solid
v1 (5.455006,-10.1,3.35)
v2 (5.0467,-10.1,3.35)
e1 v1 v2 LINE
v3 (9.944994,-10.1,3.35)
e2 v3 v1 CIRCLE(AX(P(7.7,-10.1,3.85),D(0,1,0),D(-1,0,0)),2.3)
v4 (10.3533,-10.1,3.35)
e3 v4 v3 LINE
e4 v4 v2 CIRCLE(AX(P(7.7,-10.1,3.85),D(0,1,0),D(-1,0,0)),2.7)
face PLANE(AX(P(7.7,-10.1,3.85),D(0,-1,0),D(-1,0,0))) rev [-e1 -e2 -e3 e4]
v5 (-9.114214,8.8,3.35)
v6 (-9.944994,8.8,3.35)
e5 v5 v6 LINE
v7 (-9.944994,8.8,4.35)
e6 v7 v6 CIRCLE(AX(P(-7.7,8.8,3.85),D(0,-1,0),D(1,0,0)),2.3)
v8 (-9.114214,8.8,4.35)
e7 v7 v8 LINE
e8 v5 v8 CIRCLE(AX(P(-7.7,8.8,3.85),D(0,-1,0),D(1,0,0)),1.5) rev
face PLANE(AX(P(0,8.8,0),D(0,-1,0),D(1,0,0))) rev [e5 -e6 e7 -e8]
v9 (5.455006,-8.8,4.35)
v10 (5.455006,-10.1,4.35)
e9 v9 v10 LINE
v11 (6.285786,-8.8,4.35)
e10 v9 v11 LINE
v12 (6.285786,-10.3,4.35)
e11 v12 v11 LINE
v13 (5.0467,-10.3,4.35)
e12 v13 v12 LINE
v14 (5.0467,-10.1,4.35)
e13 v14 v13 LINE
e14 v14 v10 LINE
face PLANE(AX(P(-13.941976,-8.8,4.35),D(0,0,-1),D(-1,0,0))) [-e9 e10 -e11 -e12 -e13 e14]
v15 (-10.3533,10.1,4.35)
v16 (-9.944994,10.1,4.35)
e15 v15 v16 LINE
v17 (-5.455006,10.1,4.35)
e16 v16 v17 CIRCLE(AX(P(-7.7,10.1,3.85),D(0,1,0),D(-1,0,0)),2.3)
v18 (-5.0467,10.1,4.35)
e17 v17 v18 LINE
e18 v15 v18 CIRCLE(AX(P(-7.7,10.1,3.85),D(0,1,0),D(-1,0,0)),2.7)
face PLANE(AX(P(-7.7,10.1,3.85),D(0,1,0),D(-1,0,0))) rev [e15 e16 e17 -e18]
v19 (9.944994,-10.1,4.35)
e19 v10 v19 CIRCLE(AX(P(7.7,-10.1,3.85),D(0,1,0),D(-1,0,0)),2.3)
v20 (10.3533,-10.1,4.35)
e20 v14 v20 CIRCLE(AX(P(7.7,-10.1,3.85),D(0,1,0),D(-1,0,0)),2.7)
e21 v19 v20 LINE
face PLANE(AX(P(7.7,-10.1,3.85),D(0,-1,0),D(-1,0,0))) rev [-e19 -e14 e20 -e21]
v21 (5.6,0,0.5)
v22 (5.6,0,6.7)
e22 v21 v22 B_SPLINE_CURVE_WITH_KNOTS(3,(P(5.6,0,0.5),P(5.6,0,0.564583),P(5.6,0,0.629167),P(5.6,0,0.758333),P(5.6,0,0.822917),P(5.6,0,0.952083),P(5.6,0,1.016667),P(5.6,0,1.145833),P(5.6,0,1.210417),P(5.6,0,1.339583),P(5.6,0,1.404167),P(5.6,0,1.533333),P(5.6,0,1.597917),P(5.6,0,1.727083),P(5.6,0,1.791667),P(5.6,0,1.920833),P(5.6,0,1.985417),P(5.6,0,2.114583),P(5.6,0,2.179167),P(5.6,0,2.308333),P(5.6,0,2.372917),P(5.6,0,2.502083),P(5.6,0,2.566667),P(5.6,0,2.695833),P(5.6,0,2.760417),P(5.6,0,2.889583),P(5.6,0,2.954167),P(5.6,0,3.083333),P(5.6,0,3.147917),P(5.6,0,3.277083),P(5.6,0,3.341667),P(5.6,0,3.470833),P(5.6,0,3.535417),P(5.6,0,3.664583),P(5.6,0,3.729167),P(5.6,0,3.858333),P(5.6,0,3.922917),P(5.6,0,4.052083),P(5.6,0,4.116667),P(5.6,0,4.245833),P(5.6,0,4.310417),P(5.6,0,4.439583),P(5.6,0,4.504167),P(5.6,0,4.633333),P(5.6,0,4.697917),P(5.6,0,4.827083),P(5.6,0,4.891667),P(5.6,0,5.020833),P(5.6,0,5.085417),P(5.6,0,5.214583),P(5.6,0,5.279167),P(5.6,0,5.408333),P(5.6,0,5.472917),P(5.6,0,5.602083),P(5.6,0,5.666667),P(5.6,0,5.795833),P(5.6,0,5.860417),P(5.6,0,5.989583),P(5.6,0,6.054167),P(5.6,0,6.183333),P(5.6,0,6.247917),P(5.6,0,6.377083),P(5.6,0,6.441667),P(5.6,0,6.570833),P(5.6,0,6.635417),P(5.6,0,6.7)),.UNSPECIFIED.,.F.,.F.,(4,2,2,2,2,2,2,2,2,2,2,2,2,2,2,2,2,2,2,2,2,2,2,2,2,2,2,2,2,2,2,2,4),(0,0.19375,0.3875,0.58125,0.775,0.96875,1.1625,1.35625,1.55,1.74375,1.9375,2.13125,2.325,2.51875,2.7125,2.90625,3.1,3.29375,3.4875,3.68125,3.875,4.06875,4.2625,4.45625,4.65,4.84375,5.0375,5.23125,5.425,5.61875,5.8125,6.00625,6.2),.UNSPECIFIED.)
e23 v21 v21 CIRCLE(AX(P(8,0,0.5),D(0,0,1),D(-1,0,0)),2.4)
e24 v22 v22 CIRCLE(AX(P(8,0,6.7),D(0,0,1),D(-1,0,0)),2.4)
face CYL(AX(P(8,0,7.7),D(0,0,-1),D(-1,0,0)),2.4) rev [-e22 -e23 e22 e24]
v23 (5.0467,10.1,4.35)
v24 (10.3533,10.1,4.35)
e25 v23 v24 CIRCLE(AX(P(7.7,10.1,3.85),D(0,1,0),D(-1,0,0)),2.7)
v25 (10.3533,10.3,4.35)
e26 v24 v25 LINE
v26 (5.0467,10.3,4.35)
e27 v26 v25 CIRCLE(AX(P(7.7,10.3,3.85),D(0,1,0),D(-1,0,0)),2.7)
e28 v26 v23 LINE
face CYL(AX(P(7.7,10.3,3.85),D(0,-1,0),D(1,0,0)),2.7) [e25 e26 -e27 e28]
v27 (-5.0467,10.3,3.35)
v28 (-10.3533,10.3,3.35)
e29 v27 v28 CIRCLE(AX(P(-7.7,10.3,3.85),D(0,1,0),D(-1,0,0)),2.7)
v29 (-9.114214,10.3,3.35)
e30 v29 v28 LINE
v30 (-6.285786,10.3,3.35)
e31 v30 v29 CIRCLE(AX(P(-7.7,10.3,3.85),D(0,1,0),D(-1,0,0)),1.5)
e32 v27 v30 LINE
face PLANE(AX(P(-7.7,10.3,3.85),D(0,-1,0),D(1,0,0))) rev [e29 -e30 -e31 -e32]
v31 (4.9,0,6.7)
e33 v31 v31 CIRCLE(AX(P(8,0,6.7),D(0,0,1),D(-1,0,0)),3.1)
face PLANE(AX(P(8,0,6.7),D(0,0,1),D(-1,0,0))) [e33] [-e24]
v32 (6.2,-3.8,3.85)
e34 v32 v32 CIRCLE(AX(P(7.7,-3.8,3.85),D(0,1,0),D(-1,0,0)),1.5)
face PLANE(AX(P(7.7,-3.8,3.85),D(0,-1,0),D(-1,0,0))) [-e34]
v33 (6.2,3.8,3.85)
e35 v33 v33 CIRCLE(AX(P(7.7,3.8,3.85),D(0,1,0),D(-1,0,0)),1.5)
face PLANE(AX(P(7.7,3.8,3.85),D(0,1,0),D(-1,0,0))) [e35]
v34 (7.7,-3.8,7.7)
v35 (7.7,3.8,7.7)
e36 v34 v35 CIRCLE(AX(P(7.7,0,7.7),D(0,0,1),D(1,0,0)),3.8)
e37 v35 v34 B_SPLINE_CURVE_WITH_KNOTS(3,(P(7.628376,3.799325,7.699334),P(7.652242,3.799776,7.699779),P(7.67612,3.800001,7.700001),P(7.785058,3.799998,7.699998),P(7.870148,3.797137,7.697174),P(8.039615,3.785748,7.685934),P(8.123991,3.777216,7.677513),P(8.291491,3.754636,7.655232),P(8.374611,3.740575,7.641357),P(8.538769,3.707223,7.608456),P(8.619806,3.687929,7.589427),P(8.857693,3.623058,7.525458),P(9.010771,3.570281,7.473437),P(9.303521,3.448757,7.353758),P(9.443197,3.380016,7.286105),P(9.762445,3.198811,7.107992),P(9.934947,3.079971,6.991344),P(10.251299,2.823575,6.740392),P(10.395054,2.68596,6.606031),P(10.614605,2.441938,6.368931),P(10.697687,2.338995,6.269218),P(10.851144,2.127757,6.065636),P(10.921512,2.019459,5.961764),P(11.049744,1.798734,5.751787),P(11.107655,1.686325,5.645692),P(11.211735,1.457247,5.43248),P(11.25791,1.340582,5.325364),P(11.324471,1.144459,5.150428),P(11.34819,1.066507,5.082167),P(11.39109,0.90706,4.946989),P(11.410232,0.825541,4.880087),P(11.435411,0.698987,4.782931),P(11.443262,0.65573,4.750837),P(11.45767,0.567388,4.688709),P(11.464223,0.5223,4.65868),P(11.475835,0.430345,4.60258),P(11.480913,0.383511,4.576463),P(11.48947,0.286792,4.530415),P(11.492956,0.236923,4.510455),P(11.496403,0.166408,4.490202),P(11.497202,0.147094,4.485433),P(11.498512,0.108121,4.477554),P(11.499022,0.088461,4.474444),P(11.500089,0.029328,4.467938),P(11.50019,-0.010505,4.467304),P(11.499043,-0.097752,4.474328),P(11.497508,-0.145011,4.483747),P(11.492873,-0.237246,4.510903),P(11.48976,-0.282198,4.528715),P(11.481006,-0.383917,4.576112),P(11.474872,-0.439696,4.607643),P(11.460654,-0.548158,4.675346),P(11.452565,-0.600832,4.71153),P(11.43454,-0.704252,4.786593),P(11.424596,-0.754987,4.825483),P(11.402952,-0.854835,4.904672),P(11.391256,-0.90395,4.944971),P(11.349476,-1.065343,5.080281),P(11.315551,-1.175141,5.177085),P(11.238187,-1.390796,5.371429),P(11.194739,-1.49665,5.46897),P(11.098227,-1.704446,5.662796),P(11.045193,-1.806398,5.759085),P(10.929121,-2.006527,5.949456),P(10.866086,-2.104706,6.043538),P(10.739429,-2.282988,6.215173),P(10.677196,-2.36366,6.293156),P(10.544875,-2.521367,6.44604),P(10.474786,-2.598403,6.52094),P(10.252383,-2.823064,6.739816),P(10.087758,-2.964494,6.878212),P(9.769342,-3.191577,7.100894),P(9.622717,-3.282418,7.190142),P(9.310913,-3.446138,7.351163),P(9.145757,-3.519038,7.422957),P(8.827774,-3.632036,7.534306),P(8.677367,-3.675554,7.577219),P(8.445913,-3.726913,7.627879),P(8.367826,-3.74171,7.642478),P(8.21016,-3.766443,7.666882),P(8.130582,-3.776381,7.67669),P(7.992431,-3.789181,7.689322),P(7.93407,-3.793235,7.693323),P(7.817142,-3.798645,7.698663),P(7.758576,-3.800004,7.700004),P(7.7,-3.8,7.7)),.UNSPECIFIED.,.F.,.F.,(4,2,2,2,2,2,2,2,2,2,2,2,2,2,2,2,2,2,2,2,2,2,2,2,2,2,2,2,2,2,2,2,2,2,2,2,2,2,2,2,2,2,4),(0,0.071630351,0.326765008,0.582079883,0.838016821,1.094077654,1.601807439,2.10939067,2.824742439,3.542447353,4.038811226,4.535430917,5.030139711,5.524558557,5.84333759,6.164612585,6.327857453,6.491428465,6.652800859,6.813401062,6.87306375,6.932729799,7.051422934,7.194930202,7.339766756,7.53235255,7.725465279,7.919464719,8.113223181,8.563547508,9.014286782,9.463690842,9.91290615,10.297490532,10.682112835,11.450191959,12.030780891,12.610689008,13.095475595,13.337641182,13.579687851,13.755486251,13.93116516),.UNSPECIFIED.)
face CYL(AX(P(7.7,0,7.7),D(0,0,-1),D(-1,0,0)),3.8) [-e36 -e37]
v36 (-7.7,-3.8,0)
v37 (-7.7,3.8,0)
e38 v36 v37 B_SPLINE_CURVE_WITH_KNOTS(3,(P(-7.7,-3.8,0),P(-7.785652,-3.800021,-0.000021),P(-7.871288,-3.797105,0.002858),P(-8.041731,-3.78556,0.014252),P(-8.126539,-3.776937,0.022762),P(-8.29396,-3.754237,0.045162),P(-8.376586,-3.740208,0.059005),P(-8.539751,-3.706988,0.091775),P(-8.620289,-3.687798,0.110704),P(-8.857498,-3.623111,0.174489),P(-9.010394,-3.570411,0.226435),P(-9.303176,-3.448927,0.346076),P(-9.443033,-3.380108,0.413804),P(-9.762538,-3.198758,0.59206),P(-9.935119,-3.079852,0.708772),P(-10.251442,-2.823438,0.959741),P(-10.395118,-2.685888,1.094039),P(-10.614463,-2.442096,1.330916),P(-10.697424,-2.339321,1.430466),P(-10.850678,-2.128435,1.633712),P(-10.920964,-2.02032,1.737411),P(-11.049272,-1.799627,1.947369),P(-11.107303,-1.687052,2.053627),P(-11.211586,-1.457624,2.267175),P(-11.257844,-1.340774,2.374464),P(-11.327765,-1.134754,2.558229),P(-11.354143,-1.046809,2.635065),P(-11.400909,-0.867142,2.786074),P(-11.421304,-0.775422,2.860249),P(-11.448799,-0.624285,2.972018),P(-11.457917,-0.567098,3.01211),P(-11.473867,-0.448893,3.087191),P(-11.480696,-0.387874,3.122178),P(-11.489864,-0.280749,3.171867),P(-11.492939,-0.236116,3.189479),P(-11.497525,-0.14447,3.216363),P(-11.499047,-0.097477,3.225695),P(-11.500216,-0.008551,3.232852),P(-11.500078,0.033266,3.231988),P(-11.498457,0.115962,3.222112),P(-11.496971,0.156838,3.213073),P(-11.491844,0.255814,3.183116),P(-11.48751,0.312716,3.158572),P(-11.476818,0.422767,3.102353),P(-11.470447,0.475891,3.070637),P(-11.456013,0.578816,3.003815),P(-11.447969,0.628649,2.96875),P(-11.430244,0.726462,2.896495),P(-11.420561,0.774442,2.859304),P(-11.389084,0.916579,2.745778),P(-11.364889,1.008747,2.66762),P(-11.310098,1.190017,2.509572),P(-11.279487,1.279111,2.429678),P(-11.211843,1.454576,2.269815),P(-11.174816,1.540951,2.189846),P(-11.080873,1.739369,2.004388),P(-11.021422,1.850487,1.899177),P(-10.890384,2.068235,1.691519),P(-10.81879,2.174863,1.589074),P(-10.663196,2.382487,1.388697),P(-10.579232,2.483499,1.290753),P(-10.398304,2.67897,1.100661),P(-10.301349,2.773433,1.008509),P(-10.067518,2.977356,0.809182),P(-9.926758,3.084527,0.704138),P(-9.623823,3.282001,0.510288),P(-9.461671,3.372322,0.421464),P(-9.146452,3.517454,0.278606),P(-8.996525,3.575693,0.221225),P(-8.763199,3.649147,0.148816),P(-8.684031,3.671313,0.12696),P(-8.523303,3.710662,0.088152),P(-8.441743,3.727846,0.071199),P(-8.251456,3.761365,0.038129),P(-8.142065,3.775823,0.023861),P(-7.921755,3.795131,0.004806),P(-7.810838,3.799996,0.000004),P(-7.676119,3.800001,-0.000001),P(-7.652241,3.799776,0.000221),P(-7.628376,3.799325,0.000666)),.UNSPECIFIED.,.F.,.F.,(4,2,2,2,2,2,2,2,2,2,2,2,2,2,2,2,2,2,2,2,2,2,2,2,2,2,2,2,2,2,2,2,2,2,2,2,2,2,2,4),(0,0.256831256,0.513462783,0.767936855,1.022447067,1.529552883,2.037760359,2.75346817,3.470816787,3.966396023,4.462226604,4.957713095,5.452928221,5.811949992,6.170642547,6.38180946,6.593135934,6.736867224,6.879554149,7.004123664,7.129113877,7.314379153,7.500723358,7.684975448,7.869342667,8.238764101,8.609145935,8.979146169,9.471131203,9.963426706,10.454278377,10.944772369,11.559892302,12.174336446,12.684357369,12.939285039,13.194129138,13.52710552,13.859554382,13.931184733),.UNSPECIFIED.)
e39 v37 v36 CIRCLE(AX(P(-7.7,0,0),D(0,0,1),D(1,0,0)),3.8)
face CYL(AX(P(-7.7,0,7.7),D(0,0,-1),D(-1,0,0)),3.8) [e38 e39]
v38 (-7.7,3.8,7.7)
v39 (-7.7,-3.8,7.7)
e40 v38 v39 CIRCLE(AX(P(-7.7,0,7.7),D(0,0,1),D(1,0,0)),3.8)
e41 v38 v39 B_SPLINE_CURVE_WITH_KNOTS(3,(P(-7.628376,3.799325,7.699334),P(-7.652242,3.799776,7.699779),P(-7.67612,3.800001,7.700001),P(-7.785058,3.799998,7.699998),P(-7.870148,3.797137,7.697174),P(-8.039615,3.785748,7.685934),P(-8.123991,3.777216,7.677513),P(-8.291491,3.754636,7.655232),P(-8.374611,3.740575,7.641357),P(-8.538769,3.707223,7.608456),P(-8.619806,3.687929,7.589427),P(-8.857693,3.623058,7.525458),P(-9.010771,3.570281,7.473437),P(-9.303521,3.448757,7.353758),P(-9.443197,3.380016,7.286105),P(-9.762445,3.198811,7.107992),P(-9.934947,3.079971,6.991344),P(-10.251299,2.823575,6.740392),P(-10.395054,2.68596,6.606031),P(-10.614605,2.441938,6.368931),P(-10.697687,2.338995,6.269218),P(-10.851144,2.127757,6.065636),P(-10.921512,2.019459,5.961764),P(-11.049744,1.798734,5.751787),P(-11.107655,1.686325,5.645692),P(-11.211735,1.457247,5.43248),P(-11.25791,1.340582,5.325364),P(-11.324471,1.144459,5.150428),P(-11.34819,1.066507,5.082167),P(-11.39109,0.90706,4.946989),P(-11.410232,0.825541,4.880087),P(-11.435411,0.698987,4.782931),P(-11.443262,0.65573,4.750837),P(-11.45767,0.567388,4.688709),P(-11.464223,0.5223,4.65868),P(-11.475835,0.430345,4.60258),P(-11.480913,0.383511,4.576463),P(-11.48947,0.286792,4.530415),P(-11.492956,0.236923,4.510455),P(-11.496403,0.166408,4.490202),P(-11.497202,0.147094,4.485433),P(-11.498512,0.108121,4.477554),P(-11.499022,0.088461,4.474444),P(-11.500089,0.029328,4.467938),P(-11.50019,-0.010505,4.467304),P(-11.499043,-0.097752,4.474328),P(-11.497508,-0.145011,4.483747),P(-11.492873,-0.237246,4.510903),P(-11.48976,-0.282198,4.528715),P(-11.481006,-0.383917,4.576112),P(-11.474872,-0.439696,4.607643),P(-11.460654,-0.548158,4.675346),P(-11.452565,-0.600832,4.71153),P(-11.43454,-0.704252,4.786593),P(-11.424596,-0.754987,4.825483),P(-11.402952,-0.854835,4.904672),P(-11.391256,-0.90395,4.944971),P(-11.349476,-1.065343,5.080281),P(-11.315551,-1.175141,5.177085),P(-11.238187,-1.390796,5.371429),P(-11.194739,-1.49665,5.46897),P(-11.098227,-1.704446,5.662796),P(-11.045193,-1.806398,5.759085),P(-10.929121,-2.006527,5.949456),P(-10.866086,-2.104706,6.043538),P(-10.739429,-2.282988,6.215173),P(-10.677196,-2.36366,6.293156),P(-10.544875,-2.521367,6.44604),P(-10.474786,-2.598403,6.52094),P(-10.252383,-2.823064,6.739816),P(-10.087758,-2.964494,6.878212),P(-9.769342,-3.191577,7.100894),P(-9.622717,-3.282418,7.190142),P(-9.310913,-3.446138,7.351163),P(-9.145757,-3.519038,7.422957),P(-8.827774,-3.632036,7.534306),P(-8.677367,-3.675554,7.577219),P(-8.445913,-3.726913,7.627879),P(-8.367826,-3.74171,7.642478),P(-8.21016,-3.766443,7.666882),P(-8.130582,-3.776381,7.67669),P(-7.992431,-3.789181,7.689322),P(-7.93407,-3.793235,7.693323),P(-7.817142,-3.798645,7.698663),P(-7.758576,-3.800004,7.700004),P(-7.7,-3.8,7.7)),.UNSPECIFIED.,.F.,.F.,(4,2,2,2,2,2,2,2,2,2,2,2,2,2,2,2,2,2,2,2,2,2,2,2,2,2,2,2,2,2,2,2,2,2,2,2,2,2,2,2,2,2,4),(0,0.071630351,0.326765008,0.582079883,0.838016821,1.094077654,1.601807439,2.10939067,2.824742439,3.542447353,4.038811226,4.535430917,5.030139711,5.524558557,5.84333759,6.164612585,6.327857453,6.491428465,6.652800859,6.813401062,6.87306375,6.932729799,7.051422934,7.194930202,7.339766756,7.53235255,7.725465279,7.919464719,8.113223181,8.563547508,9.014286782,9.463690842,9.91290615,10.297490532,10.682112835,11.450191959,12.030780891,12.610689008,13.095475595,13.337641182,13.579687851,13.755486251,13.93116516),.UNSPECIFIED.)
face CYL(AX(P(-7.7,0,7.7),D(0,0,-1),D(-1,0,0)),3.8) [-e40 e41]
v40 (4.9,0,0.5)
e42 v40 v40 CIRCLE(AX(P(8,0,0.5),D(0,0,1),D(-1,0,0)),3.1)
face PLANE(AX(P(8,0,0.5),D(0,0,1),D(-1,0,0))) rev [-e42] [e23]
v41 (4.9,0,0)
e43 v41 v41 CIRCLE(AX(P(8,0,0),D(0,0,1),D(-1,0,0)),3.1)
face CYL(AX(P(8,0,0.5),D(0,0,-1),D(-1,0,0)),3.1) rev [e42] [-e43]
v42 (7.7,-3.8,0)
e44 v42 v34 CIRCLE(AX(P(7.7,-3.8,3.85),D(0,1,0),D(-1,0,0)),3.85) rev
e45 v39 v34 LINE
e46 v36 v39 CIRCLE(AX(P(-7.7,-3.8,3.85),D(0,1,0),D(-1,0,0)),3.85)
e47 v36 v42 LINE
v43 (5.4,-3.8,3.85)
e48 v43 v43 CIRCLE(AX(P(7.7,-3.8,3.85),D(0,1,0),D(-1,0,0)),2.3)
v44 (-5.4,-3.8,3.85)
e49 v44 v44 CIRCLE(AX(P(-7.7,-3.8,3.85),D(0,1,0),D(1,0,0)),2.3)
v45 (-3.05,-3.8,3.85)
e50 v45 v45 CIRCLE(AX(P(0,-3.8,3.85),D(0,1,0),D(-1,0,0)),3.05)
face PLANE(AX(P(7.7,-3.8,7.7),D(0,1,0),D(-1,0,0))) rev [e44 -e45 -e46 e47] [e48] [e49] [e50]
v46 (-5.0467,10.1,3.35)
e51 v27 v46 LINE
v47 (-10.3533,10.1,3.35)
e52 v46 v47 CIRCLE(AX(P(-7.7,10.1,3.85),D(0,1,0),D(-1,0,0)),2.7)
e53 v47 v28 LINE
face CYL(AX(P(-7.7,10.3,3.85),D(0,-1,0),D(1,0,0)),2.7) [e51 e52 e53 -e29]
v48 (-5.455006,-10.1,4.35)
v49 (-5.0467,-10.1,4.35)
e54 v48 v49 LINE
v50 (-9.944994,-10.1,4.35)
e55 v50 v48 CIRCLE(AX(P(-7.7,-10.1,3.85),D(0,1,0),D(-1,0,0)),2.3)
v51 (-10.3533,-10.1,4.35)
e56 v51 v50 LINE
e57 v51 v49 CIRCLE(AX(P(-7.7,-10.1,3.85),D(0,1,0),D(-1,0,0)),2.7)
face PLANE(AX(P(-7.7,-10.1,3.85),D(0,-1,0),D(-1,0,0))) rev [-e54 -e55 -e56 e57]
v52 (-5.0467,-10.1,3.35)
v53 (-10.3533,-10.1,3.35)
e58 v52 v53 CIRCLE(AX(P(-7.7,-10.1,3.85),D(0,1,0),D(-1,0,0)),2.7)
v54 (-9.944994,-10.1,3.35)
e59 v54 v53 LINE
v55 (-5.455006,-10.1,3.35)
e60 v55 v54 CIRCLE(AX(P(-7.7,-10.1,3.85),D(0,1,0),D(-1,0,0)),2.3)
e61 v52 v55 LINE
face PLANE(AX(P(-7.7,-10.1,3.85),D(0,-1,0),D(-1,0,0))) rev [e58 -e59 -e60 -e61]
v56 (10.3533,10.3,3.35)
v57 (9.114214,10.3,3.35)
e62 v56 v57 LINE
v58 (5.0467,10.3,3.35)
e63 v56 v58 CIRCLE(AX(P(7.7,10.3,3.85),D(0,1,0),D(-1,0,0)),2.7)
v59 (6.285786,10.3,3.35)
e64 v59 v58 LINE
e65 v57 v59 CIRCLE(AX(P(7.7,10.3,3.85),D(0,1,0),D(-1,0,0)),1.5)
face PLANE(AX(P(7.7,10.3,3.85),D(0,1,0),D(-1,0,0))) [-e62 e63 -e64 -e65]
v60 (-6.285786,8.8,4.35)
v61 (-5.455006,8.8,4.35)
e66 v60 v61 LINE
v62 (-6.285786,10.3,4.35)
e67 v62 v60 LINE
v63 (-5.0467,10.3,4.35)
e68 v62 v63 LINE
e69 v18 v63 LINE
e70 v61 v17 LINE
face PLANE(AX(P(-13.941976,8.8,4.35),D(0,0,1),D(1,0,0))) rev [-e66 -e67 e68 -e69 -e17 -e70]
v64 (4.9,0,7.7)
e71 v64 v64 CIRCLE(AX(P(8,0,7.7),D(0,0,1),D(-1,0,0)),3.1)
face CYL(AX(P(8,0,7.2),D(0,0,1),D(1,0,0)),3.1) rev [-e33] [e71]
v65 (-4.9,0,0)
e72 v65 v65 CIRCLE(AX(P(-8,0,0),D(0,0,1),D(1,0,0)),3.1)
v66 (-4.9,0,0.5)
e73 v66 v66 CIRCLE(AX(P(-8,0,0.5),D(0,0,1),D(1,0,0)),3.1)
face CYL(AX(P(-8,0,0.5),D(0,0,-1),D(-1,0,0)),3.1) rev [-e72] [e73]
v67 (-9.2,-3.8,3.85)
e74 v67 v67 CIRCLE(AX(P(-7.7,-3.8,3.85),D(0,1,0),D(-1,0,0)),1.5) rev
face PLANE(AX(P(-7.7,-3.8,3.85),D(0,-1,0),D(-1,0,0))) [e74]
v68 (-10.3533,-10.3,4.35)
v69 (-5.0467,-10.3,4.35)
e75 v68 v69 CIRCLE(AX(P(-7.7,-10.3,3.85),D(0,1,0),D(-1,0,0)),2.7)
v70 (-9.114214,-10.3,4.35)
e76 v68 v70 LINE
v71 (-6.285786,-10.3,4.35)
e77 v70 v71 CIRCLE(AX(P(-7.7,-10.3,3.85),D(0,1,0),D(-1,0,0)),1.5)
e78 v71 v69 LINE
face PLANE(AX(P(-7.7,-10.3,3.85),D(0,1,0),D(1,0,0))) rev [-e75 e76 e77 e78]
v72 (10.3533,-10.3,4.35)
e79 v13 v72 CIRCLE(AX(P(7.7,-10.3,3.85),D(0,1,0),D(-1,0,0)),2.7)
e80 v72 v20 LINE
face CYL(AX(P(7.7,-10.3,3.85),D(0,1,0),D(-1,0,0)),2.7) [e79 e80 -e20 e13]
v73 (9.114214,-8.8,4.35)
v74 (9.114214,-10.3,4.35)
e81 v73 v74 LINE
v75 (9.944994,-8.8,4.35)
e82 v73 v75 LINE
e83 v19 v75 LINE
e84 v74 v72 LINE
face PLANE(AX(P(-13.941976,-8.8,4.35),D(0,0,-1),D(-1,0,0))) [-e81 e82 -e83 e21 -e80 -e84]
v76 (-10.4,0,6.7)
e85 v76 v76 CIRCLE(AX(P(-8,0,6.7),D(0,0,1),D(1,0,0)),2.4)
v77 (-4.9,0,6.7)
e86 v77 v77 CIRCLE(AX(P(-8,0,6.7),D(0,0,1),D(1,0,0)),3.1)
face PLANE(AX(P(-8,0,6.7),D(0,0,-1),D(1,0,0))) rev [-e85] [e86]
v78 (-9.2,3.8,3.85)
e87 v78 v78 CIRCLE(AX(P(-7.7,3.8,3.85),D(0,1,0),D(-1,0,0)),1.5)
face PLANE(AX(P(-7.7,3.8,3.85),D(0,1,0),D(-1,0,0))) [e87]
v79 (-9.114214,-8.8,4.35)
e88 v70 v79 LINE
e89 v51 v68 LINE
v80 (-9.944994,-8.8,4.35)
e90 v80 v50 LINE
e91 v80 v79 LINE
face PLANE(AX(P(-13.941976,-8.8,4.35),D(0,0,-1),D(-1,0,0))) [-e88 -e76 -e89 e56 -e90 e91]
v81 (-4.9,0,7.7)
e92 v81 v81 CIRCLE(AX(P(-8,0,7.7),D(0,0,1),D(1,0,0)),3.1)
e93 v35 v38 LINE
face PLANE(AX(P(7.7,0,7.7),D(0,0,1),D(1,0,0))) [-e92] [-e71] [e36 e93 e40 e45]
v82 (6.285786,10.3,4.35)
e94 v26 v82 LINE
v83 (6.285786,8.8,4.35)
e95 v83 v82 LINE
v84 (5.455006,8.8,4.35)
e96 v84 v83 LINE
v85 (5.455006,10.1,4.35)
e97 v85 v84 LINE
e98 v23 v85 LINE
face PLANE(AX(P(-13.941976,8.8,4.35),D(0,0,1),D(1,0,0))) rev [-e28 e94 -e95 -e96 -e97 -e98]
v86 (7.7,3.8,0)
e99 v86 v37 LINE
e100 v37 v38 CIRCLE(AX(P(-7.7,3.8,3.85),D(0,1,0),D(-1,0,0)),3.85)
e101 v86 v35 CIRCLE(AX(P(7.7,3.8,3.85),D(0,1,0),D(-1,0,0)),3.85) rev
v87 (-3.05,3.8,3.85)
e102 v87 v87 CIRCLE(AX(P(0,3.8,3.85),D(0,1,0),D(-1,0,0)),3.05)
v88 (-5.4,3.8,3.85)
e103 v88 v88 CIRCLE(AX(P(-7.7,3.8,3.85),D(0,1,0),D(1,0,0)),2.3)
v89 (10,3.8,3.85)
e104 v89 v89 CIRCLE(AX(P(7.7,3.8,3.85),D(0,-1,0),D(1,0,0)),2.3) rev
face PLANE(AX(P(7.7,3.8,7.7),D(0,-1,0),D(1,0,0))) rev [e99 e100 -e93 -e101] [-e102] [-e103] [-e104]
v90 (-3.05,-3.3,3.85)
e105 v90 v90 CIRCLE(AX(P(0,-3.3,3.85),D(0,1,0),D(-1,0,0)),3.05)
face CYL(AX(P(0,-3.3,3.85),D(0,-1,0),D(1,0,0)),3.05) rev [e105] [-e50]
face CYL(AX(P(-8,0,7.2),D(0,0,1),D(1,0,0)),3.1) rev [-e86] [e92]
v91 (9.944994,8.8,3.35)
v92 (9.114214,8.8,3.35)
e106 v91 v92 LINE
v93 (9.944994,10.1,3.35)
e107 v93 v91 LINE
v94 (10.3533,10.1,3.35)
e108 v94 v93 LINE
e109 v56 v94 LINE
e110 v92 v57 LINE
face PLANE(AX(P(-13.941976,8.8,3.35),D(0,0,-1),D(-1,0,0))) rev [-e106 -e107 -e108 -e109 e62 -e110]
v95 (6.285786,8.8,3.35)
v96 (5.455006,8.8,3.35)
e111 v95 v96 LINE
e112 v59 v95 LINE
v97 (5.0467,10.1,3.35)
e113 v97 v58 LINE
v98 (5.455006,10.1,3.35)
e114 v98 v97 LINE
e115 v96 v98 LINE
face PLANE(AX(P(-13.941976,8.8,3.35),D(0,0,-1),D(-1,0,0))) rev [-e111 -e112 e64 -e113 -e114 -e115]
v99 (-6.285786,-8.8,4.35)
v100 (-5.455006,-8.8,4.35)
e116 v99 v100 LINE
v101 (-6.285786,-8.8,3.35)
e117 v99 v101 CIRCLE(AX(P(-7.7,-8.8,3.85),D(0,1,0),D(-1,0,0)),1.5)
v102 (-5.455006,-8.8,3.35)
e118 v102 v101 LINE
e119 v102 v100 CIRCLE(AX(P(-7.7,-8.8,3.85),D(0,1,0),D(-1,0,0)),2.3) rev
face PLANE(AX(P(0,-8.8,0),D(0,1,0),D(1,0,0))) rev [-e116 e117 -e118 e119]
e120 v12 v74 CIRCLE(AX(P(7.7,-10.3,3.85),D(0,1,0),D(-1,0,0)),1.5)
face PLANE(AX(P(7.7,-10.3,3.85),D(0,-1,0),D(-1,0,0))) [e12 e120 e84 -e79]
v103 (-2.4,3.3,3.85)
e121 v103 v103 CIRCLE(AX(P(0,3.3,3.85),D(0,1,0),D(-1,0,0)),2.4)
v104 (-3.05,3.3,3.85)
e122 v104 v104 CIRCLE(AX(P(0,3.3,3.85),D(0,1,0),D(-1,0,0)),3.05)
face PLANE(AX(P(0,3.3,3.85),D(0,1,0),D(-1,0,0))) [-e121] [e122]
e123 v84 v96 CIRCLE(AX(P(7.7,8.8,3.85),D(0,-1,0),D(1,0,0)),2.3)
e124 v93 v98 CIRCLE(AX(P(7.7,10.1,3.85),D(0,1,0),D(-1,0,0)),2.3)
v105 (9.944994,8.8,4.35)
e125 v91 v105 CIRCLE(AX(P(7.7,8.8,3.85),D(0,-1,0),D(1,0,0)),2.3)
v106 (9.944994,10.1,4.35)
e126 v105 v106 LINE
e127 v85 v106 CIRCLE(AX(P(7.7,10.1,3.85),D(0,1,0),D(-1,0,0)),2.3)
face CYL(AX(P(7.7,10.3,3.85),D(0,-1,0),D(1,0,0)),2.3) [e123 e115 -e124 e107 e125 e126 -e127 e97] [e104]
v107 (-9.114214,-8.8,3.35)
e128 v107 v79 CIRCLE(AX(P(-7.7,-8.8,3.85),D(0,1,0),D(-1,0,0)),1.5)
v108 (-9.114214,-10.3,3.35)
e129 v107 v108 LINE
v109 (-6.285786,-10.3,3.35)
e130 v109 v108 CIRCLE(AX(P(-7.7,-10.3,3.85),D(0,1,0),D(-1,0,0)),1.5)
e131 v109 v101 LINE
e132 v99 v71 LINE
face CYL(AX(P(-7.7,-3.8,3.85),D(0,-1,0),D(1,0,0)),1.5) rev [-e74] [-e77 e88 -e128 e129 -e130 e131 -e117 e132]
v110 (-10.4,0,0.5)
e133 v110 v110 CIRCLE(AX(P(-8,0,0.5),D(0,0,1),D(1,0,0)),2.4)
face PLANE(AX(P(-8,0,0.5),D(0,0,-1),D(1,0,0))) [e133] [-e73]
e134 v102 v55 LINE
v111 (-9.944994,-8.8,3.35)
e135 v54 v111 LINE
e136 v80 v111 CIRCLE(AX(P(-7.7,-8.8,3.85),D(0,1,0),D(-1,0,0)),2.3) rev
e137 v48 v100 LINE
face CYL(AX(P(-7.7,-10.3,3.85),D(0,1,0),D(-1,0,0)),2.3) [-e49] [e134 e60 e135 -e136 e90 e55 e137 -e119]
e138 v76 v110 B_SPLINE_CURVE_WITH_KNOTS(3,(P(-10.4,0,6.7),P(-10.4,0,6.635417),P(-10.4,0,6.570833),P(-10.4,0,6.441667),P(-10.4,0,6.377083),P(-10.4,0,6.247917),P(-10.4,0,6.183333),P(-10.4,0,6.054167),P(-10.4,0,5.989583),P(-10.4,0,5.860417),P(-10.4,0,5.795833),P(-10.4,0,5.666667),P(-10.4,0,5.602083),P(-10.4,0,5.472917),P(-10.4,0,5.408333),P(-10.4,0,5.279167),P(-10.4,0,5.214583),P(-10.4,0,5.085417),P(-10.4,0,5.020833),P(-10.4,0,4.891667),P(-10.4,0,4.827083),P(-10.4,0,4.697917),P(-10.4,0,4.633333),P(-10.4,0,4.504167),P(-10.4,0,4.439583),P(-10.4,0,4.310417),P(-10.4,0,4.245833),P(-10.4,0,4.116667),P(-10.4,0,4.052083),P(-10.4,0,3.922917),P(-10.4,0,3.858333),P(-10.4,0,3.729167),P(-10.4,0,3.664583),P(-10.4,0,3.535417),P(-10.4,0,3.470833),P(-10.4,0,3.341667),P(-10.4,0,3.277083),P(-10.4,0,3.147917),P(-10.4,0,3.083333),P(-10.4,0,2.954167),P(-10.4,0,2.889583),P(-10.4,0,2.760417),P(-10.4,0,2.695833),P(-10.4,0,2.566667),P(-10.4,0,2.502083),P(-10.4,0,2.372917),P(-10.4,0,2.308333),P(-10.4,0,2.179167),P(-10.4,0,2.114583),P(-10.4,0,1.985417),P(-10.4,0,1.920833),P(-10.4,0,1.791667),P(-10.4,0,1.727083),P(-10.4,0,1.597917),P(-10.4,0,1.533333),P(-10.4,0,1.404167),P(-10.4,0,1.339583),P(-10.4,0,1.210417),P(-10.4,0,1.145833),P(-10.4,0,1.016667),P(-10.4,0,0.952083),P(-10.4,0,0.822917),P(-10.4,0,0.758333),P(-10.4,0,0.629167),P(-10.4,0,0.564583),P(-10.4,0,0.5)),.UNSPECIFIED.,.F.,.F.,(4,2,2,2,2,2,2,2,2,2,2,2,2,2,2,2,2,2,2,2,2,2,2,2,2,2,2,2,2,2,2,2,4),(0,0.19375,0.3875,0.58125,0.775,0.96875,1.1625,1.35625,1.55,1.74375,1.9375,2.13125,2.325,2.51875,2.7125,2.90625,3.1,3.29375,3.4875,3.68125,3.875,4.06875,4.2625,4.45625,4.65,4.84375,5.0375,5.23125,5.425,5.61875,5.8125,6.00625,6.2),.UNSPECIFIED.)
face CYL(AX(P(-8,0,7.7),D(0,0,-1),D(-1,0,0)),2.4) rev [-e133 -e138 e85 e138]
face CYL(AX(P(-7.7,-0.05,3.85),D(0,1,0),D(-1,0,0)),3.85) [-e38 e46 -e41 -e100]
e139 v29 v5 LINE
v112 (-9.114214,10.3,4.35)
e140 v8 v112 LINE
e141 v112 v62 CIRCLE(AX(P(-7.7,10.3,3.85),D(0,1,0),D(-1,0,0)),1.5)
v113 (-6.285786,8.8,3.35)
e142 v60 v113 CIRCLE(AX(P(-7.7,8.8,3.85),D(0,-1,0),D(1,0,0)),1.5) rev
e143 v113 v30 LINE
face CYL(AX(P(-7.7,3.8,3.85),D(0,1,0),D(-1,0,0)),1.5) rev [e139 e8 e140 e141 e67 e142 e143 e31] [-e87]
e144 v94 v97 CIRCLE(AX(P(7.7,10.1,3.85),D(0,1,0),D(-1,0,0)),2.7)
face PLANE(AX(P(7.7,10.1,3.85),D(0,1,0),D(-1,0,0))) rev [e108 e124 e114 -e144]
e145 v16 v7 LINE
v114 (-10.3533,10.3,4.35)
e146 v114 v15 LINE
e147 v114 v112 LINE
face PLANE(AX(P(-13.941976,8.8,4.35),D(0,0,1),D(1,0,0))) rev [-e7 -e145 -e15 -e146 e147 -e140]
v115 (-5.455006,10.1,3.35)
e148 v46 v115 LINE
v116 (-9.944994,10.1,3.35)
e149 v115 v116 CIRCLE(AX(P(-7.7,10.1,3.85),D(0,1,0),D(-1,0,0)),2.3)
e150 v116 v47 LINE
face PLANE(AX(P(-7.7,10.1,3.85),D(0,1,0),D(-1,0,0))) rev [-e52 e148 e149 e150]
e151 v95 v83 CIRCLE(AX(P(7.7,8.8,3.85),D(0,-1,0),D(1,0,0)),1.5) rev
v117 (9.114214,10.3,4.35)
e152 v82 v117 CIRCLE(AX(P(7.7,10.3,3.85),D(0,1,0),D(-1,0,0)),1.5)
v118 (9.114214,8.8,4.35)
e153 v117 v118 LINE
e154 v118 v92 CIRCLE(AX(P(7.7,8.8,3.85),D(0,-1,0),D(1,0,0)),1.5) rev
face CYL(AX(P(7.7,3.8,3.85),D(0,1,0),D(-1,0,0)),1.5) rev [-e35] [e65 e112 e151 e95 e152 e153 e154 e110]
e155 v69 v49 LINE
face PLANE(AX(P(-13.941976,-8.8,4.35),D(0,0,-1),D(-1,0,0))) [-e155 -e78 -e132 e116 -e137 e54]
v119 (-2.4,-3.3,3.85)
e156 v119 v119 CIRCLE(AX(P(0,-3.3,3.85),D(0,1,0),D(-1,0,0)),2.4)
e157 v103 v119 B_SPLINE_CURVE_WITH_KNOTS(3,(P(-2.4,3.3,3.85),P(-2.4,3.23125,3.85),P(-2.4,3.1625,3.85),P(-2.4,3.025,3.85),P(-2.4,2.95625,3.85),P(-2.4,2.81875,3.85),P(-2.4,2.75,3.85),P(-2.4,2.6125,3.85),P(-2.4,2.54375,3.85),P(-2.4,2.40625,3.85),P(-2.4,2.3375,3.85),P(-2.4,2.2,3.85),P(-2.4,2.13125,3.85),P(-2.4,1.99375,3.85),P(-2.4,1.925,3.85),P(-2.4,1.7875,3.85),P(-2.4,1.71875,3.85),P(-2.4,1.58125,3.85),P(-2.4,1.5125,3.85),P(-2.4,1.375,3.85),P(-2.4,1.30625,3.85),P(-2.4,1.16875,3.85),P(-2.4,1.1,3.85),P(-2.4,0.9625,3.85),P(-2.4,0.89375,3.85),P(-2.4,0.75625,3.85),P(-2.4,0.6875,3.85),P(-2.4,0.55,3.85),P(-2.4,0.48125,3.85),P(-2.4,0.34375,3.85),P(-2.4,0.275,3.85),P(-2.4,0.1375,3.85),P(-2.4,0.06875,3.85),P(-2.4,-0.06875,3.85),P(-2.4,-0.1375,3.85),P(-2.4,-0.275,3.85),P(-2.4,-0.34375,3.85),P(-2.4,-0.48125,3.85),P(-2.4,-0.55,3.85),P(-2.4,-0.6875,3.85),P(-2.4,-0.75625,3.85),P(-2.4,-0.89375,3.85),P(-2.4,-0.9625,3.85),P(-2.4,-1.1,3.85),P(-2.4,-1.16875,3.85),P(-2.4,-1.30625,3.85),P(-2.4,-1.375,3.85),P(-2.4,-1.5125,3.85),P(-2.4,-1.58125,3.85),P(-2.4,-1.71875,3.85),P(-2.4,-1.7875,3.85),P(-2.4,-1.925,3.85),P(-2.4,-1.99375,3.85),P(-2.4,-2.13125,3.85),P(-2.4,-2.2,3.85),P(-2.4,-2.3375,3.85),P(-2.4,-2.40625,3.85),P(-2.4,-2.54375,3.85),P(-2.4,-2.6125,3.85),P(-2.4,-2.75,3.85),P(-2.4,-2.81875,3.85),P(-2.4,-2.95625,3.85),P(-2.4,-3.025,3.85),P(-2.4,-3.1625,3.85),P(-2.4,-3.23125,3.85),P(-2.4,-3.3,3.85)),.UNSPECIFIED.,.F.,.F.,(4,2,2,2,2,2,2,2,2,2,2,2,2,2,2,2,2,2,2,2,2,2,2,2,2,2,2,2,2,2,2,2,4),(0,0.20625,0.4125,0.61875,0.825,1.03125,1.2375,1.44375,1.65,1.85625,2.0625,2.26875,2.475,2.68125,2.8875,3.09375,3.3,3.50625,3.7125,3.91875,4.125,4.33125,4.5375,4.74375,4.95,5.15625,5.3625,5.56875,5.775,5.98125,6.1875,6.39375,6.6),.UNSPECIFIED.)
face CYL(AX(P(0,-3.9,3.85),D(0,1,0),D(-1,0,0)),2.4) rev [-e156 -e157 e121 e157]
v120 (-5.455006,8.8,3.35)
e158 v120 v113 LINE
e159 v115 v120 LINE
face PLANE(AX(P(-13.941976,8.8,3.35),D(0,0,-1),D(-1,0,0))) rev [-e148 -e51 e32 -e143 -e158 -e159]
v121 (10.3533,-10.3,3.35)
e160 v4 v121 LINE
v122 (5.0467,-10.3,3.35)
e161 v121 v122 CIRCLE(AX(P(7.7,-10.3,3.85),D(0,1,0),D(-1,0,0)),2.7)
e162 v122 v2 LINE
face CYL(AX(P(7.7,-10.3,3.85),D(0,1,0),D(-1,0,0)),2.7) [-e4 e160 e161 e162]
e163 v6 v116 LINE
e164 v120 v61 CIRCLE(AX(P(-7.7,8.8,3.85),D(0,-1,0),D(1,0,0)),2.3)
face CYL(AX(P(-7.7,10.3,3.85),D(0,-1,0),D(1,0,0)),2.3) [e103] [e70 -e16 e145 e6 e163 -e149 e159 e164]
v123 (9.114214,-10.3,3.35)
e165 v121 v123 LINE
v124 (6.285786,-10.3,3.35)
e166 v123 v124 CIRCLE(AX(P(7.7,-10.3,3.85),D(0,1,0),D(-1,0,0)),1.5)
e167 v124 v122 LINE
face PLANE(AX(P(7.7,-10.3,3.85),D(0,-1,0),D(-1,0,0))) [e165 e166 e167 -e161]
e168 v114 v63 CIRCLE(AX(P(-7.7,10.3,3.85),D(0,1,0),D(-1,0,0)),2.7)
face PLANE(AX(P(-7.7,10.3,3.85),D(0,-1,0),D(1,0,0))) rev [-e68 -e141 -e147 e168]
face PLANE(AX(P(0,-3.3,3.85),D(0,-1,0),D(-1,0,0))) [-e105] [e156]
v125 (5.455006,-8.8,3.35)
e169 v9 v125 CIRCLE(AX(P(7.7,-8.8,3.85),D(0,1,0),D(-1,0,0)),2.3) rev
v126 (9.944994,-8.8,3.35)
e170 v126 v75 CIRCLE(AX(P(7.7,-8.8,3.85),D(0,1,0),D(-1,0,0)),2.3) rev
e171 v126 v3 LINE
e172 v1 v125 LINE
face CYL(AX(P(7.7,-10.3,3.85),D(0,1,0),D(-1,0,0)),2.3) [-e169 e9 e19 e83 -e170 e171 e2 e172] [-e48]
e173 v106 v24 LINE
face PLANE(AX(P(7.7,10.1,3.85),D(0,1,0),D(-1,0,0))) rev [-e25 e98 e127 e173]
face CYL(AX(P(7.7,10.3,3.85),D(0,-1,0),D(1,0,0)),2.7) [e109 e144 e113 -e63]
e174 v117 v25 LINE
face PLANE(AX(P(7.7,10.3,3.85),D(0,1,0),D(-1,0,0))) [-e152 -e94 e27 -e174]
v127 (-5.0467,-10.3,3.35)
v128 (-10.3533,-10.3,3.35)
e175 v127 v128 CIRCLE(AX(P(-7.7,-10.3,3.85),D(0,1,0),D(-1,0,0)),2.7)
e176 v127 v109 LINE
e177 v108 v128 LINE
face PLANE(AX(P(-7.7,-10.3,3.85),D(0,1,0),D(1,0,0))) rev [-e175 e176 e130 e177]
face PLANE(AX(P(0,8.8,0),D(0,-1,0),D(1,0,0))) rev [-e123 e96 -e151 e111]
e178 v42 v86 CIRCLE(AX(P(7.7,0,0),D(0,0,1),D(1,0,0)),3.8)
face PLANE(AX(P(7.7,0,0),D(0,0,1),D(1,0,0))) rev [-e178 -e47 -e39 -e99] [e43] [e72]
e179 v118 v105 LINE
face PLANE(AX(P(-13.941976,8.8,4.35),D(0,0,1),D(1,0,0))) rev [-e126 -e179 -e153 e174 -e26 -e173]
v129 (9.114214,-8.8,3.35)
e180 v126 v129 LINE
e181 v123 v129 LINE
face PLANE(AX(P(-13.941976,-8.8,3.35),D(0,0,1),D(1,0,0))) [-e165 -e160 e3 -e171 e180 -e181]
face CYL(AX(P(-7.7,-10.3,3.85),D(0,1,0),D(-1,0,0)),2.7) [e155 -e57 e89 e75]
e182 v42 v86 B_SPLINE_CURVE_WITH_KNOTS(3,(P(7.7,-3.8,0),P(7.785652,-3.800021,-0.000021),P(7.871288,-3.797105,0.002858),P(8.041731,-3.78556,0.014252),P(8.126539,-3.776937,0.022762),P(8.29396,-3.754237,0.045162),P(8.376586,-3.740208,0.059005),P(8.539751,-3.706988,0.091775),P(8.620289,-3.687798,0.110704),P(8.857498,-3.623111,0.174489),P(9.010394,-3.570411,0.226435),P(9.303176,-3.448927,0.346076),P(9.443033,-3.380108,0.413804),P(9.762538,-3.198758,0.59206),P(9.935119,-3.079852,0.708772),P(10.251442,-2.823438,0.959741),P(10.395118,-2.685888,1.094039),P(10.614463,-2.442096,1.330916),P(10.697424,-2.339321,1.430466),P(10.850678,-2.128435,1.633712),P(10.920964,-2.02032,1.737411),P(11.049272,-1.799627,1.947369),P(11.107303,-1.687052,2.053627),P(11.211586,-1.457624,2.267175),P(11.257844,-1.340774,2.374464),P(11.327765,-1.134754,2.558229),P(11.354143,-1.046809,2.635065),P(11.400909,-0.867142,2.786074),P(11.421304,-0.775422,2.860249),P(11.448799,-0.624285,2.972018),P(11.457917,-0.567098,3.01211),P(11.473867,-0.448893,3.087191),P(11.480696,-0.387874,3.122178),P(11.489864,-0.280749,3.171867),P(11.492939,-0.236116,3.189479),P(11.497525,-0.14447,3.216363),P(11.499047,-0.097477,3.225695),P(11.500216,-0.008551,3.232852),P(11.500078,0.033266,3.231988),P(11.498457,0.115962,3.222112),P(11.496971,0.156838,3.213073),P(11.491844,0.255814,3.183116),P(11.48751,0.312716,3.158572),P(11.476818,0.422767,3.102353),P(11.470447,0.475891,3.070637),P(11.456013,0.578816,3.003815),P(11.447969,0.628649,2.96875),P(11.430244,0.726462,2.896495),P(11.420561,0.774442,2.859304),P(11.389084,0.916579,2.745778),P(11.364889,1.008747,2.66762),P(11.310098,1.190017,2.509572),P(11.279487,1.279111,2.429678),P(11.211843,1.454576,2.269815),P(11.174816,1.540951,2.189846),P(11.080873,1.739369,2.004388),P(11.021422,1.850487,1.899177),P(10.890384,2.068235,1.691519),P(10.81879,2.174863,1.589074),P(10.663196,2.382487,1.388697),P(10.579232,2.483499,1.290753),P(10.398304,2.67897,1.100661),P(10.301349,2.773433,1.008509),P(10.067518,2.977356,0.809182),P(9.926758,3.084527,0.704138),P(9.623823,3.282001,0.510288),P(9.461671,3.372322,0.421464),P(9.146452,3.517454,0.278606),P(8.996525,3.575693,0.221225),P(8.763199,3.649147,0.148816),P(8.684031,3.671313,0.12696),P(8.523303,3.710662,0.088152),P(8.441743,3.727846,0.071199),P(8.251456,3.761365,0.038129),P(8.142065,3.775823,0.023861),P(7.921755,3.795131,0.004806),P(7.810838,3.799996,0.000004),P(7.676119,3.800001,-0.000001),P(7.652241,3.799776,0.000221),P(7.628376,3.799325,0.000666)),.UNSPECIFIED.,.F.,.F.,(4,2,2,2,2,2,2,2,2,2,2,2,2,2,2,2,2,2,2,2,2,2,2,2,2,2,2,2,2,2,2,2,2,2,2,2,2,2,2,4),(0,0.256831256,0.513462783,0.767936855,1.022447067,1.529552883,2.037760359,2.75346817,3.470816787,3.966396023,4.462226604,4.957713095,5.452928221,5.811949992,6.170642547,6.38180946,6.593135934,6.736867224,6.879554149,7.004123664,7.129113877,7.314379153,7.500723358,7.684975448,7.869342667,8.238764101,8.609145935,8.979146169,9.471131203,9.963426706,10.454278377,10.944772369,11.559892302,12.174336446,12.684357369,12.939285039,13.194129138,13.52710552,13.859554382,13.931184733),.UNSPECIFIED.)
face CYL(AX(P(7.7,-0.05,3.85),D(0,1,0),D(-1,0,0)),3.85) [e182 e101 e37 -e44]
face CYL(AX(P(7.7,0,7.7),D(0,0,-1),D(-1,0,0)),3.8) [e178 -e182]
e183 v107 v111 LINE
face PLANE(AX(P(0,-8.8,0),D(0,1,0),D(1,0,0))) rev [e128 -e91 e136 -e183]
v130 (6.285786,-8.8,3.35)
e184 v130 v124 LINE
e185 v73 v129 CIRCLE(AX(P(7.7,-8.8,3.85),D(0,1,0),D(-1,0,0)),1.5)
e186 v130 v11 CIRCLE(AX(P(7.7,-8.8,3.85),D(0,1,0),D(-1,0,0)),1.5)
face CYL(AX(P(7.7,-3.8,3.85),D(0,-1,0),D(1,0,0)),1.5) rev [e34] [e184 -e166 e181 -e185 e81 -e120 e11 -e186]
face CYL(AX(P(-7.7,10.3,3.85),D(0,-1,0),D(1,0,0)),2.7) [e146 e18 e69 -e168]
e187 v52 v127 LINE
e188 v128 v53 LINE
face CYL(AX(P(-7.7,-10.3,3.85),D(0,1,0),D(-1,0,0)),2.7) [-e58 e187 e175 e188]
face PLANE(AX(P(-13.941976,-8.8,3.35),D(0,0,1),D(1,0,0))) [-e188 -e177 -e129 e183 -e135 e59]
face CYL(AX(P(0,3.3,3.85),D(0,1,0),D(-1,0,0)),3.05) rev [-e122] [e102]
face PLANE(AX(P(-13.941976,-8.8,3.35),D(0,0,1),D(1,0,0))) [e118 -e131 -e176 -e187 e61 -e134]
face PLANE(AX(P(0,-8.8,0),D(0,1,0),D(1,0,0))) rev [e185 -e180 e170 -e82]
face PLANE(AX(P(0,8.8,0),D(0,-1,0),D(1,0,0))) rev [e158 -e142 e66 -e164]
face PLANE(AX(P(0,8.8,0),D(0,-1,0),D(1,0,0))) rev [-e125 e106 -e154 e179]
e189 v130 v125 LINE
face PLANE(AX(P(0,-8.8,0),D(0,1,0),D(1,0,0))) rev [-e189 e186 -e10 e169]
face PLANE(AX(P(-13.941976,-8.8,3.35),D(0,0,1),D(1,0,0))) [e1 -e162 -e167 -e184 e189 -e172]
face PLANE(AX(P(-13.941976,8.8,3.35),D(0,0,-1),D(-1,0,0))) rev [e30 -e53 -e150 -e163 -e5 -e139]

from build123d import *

# Parameters (mm, degrees)
SKETCH2_R           = 2.4
BOSS_EXTRUDE1_DEPTH = 7.7
SKETCH4_R           = 2.4
CUT_EXTRUDE1_DEPTH  = 7.7
SKETCH7_R           = 3.05
SKETCH7_R_2         = 2.4
CUT_EXTRUDE2_DEPTH  = 0.5
SKETCH8_R           = 2.3
BOSS_EXTRUDE2_DEPTH = 6.5
SKETCH9_R           = 1.5
CUT_EXTRUDE3_DEPTH  = 6.5
BOSS_EXTRUDE4_START = -3.85
SKETCH10_R          = 3.05
BOSS_EXTRUDE4_DEPTH = 3.85
SKETCH13_R          = 2.7
SKETCH13_R_2        = 2.3
BOSS_EXTRUDE6_DEPTH = 0.2
CUT_EXTRUDE4_START  = -0.5
SKETCH14_R          = 3.1
SKETCH14_R_2        = 2.4
CUT_EXTRUDE4_DEPTH  = 0.5
SKETCH16_W          = 27.88395247
SKETCH16_H          = 1
CUT_EXTRUDE5_DEPTH  = 1.5
MIRROR5_OUTLINE_R   = 3.1
MIRROR5_DEPTH       = 0.5
MIRROR5_START       = 6.7
MIRROR5_2_OUTLINE_R = 3.1
MIRROR5_2_DEPTH     = 0.5
SKETCH17_R          = 2.4
CUT_EXTRUDE6_DEPTH  = 18.285326258


# Read off the part's stored shape, not the designer's step: Mirror5
with BuildPart() as part:
    # Sketch2 → Boss-Extrude1 (new body)
    with BuildSketch(Plane.XY):
        with BuildLine():
            Line((7.7, -3.8), (-7.7, -3.8))
            ThreePointArc((-7.7, -3.8), (-11.5, 0), (-7.7, 3.8))
            Line((-7.7, 3.8), (7.7, 3.8))
            ThreePointArc((7.7, 3.8), (11.5, 0), (7.7, -3.8))
        make_face()
        with Locations(Location((8, 0, 0), (0, 0, 180))):
            Circle(SKETCH2_R, mode=Mode.SUBTRACT)
        with Locations(Location((-8, 0, 0), (0, 0, 180))):
            Circle(SKETCH2_R, mode=Mode.SUBTRACT)
    extrude(amount=BOSS_EXTRUDE1_DEPTH)

    # Sketch4 → Cut-Extrude1 (cut)
    with BuildSketch(Plane(origin=(0, 3.8, 0), x_dir=(1, 0, 0), z_dir=(0, 1, 0))):
        with Locations(Location((0, -3.85, 0), (0, 0, 180))):
            Circle(SKETCH4_R)
    extrude(amount=-CUT_EXTRUDE1_DEPTH, mode=Mode.SUBTRACT)

    # Sketch7 → Cut-Extrude2 (cut)
    with BuildSketch(Plane(origin=(0, 3.8, 0), x_dir=(1, 0, 0), z_dir=(0, 1, 0))):
        with Locations(Location((0, -3.85, 0), (0, 0, 180))):
            Circle(SKETCH7_R)
        with Locations(Location((0, -3.85, 0), (0, 0, 180))):
            Circle(SKETCH7_R_2, mode=Mode.SUBTRACT)
    cut_extrude2 = extrude(amount=-CUT_EXTRUDE2_DEPTH, mode=Mode.SUBTRACT)

    # Mirror1: Cut-Extrude2 across plane
    add(cut_extrude2.mirror(Plane.ZX), mode=Mode.SUBTRACT)

    # Sketch8 → Boss-Extrude2 (add)
    with BuildSketch(Plane(origin=(0, 3.8, 0), x_dir=(1, 0, 0), z_dir=(0, 1, 0))):
        with Locations(Location((7.7, -3.85, 0), (0, 0, 270))):
            Circle(SKETCH8_R)
        with Locations((-7.7, -3.85)):
            Circle(SKETCH8_R)
    boss_extrude2 = extrude(amount=BOSS_EXTRUDE2_DEPTH)

    # Sketch9 → Cut-Extrude3 (cut)
    with BuildSketch(Plane(origin=(0, 10.3, 0), x_dir=(1, 0, 0), z_dir=(0, 1, 0))):
        with Locations(Location((7.7, -3.85, 0), (0, 0, 180))):
            Circle(SKETCH9_R)
        with Locations(Location((-7.7, -3.85, 0), (0, 0, 180))):
            Circle(SKETCH9_R)
    cut_extrude3 = extrude(amount=-CUT_EXTRUDE3_DEPTH, mode=Mode.SUBTRACT)

    # Sketch10 → Boss-Extrude4 (add)
    # profile 1 of 3: a face of its own
    with BuildSketch(Plane(origin=(0, 3.8, 0), x_dir=(1, 0, 0), z_dir=(0, 1, 0)).offset(BOSS_EXTRUDE4_START)):
        with BuildLine():
            ThreePointArc((-7.7, 0), (-11.55, -3.85), (-7.7, -7.7))
            Line((-7.7, -7.7), (-7.7, -6.15))
            ThreePointArc((-7.7, -6.15), (-5.4, -3.85), (-7.7, -1.55))
            Line((-7.7, -1.55), (-7.7, 0))
        make_face()
    # profile 2 of 3: a face of its own
    with BuildSketch(Plane(origin=(0, 3.8, 0), x_dir=(1, 0, 0), z_dir=(0, 1, 0)).offset(BOSS_EXTRUDE4_START)):
        with BuildLine():
            Line((7.7, -7.7), (7.7, -6.15))
            ThreePointArc((7.7, -6.15), (5.4, -3.85), (7.7, -1.55))
            Line((7.7, -1.55), (7.7, 0))
            Line((7.7, 0), (-7.7, 0))
            Line((-7.7, 0), (-7.7, -1.55))
            ThreePointArc((-7.7, -1.55), (-5.4, -3.85), (-7.7, -6.15))
            Line((-7.7, -6.15), (-7.7, -7.7))
            Line((-7.7, -7.7), (7.7, -7.7))
        make_face()
        with Locations(Location((0, -3.85, 0), (0, 0, 180))):
            Circle(SKETCH10_R, mode=Mode.SUBTRACT)
    # profile 3 of 3: a face of its own
    with BuildSketch(Plane(origin=(0, 3.8, 0), x_dir=(1, 0, 0), z_dir=(0, 1, 0)).offset(BOSS_EXTRUDE4_START)):
        with BuildLine():
            ThreePointArc((7.7, 0), (11.55, -3.85), (7.7, -7.7))
            Line((7.7, -7.7), (7.7, -6.15))
            ThreePointArc((7.7, -6.15), (5.4, -3.85), (7.7, -1.55))
            Line((7.7, -1.55), (7.7, 0))
        make_face()
    boss_extrude4 = extrude(amount=BOSS_EXTRUDE4_DEPTH)

    # Mirror2: Boss-Extrude2, Cut-Extrude3, Boss-Extrude4 across plane
    add(boss_extrude2.mirror(Plane.ZX))
    add(cut_extrude3.mirror(Plane.ZX), mode=Mode.SUBTRACT)
    add(boss_extrude4.mirror(Plane.ZX))

    # Sketch13 → Boss-Extrude6 (add)
    # profile 1 of 2: a face of its own
    with BuildSketch(Plane(origin=(0, 10.1, 0), x_dir=(1, 0, 0), z_dir=(0, 1, 0))):
        with Locations(Location((-7.7, -3.85, 0), (0, 0, 180))):
            Circle(SKETCH13_R)
        with Locations((-7.7, -3.85)):
            Circle(SKETCH13_R_2, mode=Mode.SUBTRACT)
    # profile 2 of 2: a face of its own
    with BuildSketch(Plane(origin=(0, 10.1, 0), x_dir=(1, 0, 0), z_dir=(0, 1, 0))):
        with Locations(Location((7.7, -3.85, 0), (0, 0, 180))):
            Circle(SKETCH13_R)
        with Locations((7.7, -3.85)):
            Circle(SKETCH13_R_2, mode=Mode.SUBTRACT)
    boss_extrude6 = extrude(amount=BOSS_EXTRUDE6_DEPTH)

    # Sketch14 → Cut-Extrude4 (cut)
    # profile 1 of 2: a face of its own
    with BuildSketch(Plane.XY.offset(7.7).offset(CUT_EXTRUDE4_START)):
        with Locations((-8, 0)):
            Circle(SKETCH14_R)
        with Locations((-8, 0)):
            Circle(SKETCH14_R_2, mode=Mode.SUBTRACT)
    # profile 2 of 2: a face of its own
    with BuildSketch(Plane.XY.offset(7.7).offset(CUT_EXTRUDE4_START)):
        with Locations(Location((8, 0, 0), (0, 0, 180))):
            Circle(SKETCH14_R)
        with Locations((8, 0)):
            Circle(SKETCH14_R_2, mode=Mode.SUBTRACT)
    extrude(amount=CUT_EXTRUDE4_DEPTH, mode=Mode.SUBTRACT)

    # Mirror3: Boss-Extrude6 across plane
    add(boss_extrude6.mirror(Plane.ZX))

    # Sketch16 → Cut-Extrude5 (cut)
    with BuildSketch(Plane(origin=(0, 10.3, 0), x_dir=(1, 0, 0), z_dir=(0, 1, 0))):
        with Locations((0, -3.85)):
            Rectangle(SKETCH16_W, SKETCH16_H)
    cut_extrude5 = extrude(amount=-CUT_EXTRUDE5_DEPTH, mode=Mode.SUBTRACT)

    # Mirror4: Cut-Extrude5 across plane
    add(cut_extrude5.mirror(Plane.ZX), mode=Mode.SUBTRACT)

    # Mirror5 outline → Mirror5 (cut)
    # profile 1 of 2: a face of its own
    with BuildSketch(Plane.XY):
        with Locations((-8, 0)):
            Circle(MIRROR5_OUTLINE_R)
        with BuildLine():
            ThreePointArc((-10.288436326, 0.723228306), (-5.6, 7.56e-07), (-10.28843587, -0.72322975))
            ThreePointArc((-10.28843587, -0.72322975), (-10.4, -7.57e-07), (-10.288436326, 0.723228306))
        make_face(mode=Mode.SUBTRACT)
    # profile 2 of 2: a face of its own
    with BuildSketch(Plane.XY):
        with Locations((8, 0)):
            Circle(MIRROR5_OUTLINE_R)
        with BuildLine():
            ThreePointArc((10.28843587, -0.72322975), (5.6, 7.56e-07), (10.288436326, 0.723228306))
            ThreePointArc((10.288436326, 0.723228306), (10.4, -7.57e-07), (10.28843587, -0.72322975))
        make_face(mode=Mode.SUBTRACT)
    extrude(amount=MIRROR5_DEPTH, mode=Mode.SUBTRACT)

    # Mirror5 2 outline → Mirror5 2 (cut)
    # profile 1 of 2: a face of its own
    with BuildSketch(Plane.XY.offset(MIRROR5_START)):
        with Locations((-8, 0)):
            Circle(MIRROR5_2_OUTLINE_R)
        with BuildLine():
            ThreePointArc((-10.288436326, 0.723228306), (-5.6, 7.56e-07), (-10.28843587, -0.72322975))
            ThreePointArc((-10.28843587, -0.72322975), (-10.4, -7.57e-07), (-10.288436326, 0.723228306))
        make_face(mode=Mode.SUBTRACT)
    # profile 2 of 2: a face of its own
    with BuildSketch(Plane.XY.offset(MIRROR5_START)):
        with Locations((8, 0)):
            Circle(MIRROR5_2_OUTLINE_R)
        with BuildLine():
            ThreePointArc((10.28843587, -0.72322975), (5.6, 7.56e-07), (10.288436326, 0.723228306))
            ThreePointArc((10.288436326, 0.723228306), (10.4, -7.57e-07), (10.28843587, -0.72322975))
        make_face(mode=Mode.SUBTRACT)
    extrude(amount=MIRROR5_2_DEPTH, mode=Mode.SUBTRACT)

    # Sketch17 → Cut-Extrude6 (cut, through all)
    with BuildSketch(Plane(origin=(0, 0, 0), x_dir=(-1, 0, 0), z_dir=(0, 0, -1))):
        with Locations((-8, 0)):
            Circle(SKETCH17_R)
        with Locations((8, 0)):
            Circle(SKETCH17_R)
    extrude(amount=-CUT_EXTRUDE6_DEPTH, mode=Mode.SUBTRACT)


solid = part.part
